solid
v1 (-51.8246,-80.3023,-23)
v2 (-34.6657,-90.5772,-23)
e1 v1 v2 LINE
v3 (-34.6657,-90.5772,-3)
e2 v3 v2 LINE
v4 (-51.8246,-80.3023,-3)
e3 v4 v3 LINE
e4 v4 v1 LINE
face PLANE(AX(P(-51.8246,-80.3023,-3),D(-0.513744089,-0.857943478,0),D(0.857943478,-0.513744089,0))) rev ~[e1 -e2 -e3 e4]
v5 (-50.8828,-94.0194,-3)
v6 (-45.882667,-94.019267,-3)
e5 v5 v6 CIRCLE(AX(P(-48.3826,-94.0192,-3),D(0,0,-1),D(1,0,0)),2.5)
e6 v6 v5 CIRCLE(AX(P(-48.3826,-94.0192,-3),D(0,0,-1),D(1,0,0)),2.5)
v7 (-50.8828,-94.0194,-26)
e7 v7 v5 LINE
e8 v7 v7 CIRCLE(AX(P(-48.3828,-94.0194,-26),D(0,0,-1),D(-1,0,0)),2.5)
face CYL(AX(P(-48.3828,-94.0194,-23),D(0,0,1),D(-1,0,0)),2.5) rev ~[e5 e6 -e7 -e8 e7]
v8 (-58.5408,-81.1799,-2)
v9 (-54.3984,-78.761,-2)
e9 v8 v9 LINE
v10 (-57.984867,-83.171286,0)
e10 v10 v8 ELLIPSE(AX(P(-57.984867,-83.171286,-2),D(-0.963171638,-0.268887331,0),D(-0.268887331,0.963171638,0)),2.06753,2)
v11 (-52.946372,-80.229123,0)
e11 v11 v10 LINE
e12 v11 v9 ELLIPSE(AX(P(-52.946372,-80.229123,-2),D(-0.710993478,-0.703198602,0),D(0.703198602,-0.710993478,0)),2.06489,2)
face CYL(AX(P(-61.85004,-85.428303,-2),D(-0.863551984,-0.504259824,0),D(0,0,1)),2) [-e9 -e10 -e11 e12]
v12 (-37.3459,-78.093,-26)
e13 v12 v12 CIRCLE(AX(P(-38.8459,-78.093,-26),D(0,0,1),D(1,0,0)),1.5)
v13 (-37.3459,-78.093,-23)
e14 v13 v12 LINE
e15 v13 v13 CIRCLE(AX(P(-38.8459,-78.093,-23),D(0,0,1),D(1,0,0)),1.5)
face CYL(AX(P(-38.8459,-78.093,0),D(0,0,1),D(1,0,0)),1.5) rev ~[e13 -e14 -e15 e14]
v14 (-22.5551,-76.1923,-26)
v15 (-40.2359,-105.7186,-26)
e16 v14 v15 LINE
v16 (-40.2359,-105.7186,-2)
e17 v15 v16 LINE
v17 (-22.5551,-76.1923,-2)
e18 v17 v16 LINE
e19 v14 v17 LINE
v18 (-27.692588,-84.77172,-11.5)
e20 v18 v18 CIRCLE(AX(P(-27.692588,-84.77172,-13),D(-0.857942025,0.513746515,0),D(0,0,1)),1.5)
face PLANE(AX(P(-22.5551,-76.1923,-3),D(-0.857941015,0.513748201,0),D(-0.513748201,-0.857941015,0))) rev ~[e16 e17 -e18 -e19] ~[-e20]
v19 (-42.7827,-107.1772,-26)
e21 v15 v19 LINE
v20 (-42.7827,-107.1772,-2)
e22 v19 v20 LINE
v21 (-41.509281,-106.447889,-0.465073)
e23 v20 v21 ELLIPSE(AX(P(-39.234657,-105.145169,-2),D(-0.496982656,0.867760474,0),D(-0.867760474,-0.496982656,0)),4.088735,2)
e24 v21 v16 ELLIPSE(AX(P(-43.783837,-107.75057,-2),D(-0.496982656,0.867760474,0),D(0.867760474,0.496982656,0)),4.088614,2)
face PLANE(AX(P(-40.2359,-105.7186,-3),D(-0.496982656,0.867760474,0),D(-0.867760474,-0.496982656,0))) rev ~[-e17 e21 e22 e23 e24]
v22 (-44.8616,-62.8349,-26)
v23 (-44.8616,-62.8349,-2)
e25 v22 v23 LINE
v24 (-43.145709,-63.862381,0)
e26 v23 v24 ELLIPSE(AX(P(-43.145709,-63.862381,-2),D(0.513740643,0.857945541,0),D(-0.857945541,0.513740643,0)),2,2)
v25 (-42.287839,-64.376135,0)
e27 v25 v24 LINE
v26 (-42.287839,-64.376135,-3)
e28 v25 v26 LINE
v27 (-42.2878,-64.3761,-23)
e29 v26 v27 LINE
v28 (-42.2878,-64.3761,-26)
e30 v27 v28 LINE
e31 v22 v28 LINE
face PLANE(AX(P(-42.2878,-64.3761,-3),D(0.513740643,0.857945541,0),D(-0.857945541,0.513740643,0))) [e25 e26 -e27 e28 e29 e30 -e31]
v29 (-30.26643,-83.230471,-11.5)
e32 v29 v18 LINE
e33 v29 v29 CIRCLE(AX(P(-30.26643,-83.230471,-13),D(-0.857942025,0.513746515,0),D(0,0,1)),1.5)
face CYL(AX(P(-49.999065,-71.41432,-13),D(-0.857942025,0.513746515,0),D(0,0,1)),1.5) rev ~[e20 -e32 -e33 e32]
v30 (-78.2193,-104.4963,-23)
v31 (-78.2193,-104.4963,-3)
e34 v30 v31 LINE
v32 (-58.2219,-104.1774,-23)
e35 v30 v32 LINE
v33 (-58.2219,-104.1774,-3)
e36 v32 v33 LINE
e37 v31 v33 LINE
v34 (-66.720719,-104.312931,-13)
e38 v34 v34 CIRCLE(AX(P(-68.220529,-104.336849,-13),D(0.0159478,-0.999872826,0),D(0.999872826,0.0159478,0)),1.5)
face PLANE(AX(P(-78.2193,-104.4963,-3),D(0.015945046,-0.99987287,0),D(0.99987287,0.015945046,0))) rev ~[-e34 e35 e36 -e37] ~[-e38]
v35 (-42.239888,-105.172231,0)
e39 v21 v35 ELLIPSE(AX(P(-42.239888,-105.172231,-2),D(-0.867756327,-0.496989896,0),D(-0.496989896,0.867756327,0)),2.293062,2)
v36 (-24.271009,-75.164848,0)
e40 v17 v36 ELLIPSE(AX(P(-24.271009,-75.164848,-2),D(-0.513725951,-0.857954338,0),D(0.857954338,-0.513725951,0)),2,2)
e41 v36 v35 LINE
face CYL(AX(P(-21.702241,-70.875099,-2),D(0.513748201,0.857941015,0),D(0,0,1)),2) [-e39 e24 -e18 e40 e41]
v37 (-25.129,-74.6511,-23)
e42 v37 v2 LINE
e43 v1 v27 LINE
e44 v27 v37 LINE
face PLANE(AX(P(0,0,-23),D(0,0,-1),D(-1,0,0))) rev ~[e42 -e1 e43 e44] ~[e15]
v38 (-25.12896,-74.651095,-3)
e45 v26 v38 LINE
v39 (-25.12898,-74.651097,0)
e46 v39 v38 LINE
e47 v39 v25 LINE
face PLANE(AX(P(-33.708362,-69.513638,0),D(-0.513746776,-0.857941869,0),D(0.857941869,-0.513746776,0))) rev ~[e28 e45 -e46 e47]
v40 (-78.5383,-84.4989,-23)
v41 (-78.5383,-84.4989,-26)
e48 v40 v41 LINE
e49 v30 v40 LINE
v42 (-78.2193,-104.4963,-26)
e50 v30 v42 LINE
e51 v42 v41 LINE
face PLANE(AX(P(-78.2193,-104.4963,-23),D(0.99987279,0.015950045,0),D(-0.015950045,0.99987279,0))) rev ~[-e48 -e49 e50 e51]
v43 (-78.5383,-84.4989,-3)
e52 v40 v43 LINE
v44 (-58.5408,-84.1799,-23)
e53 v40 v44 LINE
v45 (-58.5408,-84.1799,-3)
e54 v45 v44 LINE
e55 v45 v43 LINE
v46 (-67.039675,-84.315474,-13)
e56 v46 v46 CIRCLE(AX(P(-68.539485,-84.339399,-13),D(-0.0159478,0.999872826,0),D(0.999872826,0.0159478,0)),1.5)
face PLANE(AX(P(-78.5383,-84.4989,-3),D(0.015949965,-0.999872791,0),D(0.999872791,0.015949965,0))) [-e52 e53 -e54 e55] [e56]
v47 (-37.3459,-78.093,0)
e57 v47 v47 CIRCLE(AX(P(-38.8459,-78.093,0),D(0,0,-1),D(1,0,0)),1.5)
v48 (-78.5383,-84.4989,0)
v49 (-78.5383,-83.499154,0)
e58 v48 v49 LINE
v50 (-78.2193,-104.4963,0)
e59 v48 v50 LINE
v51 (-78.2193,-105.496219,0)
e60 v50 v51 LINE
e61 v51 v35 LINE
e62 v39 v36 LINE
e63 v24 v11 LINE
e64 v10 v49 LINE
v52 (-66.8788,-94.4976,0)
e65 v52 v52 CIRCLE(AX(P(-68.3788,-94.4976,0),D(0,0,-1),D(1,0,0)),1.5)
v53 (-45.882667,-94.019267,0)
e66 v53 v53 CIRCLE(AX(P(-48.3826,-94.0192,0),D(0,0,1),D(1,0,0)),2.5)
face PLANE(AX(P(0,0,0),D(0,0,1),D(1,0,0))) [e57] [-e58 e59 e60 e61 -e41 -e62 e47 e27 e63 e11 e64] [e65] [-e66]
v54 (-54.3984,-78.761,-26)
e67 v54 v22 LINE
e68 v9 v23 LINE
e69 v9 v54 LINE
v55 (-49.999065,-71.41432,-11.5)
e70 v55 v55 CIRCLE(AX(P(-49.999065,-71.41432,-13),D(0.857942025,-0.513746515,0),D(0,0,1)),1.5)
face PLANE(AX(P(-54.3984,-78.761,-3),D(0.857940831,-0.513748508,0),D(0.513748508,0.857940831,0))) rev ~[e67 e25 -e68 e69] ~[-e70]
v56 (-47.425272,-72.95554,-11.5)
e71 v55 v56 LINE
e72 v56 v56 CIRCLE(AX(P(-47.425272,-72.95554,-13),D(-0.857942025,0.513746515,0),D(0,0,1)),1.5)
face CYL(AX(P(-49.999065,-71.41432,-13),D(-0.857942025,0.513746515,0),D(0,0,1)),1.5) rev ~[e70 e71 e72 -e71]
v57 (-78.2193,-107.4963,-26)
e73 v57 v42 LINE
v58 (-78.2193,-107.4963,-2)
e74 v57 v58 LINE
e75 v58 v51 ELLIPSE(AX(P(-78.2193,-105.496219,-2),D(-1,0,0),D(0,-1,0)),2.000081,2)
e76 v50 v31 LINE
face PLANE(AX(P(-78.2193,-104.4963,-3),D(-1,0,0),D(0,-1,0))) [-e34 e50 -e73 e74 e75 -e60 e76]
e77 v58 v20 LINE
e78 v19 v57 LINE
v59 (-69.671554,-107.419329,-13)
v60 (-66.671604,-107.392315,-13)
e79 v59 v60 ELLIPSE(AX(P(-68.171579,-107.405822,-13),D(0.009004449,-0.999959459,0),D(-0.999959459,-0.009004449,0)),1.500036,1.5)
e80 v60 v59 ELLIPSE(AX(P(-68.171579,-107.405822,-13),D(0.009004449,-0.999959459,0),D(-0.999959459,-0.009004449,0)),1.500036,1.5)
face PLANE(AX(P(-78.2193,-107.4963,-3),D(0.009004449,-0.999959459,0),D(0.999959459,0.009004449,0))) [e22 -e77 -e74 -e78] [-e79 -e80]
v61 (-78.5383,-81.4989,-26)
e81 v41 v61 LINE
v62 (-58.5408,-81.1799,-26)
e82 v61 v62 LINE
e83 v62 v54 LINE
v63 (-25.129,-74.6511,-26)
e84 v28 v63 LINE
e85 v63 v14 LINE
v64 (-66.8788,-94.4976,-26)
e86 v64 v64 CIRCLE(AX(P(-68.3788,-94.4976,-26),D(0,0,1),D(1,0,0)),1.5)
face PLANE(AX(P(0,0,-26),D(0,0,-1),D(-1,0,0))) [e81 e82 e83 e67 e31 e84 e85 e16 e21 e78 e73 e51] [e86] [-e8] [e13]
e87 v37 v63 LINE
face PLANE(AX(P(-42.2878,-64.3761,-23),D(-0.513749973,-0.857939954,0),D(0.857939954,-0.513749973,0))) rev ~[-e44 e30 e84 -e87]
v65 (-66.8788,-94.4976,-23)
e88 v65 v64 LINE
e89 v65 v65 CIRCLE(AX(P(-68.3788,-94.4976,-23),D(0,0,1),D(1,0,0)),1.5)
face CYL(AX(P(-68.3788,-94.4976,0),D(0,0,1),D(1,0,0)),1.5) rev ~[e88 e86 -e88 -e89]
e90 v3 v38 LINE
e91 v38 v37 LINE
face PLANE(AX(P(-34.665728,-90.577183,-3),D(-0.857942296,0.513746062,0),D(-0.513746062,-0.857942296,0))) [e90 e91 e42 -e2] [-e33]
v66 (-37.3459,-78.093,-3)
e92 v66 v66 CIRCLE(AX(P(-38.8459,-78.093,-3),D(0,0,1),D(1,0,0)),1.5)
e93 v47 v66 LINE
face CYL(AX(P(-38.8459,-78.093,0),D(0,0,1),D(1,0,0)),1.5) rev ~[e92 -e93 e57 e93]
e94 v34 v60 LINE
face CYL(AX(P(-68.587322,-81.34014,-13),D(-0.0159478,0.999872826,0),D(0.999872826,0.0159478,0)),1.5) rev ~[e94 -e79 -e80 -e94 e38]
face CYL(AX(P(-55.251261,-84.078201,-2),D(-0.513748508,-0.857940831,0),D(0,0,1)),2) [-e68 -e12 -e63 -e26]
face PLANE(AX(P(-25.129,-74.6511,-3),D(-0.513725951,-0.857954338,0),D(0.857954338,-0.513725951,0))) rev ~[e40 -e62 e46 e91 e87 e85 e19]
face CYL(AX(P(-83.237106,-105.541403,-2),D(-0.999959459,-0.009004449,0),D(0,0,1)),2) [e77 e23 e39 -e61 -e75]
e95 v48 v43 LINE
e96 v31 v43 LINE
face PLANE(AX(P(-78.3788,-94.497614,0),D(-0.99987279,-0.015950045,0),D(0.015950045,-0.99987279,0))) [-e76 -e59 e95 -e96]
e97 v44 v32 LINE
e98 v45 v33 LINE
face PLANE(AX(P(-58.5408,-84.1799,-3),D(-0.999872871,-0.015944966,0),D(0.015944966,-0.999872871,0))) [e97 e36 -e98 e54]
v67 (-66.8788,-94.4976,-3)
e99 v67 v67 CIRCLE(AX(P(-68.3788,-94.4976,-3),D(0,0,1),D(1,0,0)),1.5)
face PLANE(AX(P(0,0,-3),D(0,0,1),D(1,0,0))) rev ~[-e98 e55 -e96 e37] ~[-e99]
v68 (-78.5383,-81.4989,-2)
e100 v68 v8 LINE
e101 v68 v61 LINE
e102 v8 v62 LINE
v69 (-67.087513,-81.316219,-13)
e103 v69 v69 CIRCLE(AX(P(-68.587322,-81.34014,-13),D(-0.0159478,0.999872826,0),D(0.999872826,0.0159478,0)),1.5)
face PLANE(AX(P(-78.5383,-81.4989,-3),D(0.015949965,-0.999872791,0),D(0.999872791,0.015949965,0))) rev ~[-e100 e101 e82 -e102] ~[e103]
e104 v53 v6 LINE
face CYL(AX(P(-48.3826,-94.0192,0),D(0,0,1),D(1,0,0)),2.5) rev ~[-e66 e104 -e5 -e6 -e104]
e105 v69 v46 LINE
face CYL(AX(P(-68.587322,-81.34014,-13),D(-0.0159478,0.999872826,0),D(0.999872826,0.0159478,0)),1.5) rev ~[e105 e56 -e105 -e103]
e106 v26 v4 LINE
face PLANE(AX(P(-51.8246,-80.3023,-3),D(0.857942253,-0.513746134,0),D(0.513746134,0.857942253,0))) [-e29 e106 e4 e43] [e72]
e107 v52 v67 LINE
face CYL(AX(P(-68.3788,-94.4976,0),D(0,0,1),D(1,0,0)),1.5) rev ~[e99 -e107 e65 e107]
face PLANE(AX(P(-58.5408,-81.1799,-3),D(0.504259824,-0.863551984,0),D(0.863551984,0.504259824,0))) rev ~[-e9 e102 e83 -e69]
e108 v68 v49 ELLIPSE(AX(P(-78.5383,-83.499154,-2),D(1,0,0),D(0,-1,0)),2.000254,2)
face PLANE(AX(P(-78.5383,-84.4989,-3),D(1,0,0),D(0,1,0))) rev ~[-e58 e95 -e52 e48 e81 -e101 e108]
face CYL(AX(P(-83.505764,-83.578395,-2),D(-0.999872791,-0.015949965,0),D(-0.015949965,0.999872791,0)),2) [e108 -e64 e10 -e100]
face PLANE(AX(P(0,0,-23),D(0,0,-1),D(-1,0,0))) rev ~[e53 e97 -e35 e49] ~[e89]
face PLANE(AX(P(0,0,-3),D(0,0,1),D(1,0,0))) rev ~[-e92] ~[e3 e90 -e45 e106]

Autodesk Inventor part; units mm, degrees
ref_plane "YZ Plane" through (0, 0, 0) normal (1, 0, 0) x (0, 1, 0)
ref_plane "XZ Plane" through (0, 0, 0) normal (0, 1, 0) x (-1, 0, 0)
ref_plane "XY Plane" through (0, 0, 0) normal (0, 0, 1) x (1, 0, 0)
sketch "Sketch1" plane through (0, 0, 0) normal (0, 0, 1) x (1, 0, 0)
  circle A0 centre (-48.3826, -94.0192) radius 2.5
  circle A1 centre (2.8152, 8.6005) radius 2.5
  line L0 (-48.3826, -94.0192) -> (40.5013, 54.4144)
  line L1 (2.8152, 8.6005) -> (32.8522, -42.034)
  line L2 (-2.0828, 38.9998) -> (-2.0828, -39)
  line L3 (-2.0828, -0.0001) -> (69.8745, -0.0001)
  line L4 (7.9172, -0.0001) -> (-0.6834, -5.1021)
  line L5 (2.8152, 8.6005) -> (7.9172, -0.0001)
  line L6 (7.9172, -0.0001) -> (16.5177, 5.1019)
  line L7 (7.9172, -0.0001) -> (-0.6834, -5.1021)
  line L8 (-0.6834, -5.1021) -> (-0.6834, -5.1021)
  line L9 (7.9172, -0.0001) -> (16.5177, 5.1019)
  line L10 (16.5177, 5.1019) -> (16.5177, 5.1019)
  line L11 (7.9172, -0.0001) -> (-0.6622, 5.1374)
  line L12 (7.9172, -0.0001) -> (16.4966, -5.1375)
  line L13 (-48.3826, -94.0192) -> (-43.2452, -85.4397)
  line L14 (-54.6233, -56.9895) -> (-9.7188, -83.8789)
  line L15 (-43.2452, -85.4397) -> (-34.6657, -90.5772)
  line L16 (-43.2452, -85.4397) -> (-51.8246, -80.3023)
  line L17 (-34.6657, -90.5772) -> (16.4966, -5.1375)
  line L18 (-0.6622, 5.1374) -> (-51.8246, -80.3023)
  line L19 (-3.7386, 0) -> (13.452, 10.2217)
  line L20 (-3.7386, 0) -> (13.4203, -10.2749)
  circle A2 centre (6.9172, -34) radius 2.5
  circle A3 centre (6.9172, -34) radius 5
  circle A4 centre (6.9172, 34) radius 2.5
  circle A5 centre (6.9172, 34) radius 4.9998
  line L21 (15.8878, 38.9998) -> (-2.0828, 38.9998)
  line L22 (-2.0828, -39) -> (15.933, -39)
  line L23 (-13.3434, -16.0398) -> (19.6624, -35.8041)
  line L24 (-13.3434, 16.0396) -> (19.6624, 35.8039)
  line L25 (-13.3434, -16.0398) -> (-15.9172, -14.4985)
  line L26 (-2.0828, -0.0001) -> (-26.2435, -0.0001)
  line L27 (-15.9172, -14.4985) -> (-7.2354, -0.0001)
  line L28 (-13.3434, 16.0396) -> (-15.9172, 14.4984)
  line L29 (-15.9172, 14.4984) -> (-7.2354, -0.0001)
  line L30 (13.4203, -10.2749) -> (15.9172, -11.7701)
  line L31 (15.933, -39) -> (15.8878, 38.9998)
  line L32 (13.452, 10.2217) -> (15.9037, 11.6795)
  line L33 (15.9037, 11.6795) -> (6.3124, 27.8097)
  line L34 (15.9172, -11.7701) -> (6.3124, -27.8099)
  line L35 (15.9037, 11.6795) -> (15.9172, -11.7701)
  line L36 (-15.9172, -14.4985) -> (-15.9172, 14.4984)
  line L37 (6.3124, 27.8097) -> (-15.9172, 14.4984) projected
  circle A6 centre (-48.3826, -94.0192) radius 2.5
  line L38 (-311.4249, 0) -> (127.5863, 0)
  line L39 (-170.3704, -117.2696) -> (-13.4682, 154.4931)
  line L40 (-102.6648, 0) -> (-157.9558, -95.7668)
  line L41 (-157.9558, -95.7668) -> (-48.3826, -94.0192)
  line L42 (-48.3826, -94.0192) -> (-58.3814, -94.1786)
  line L43 (-58.3814, -94.1786) -> (-58.5408, -84.1799)
  line L44 (-58.5408, -84.1799) -> (-58.2219, -104.1774)
  line L45 (-51.8246, -80.3023) -> (-41.5497, -63.1434)
  line L46 (-41.5497, -63.1434) -> (-24.3908, -73.4184)
  line L47 (-58.5408, -84.1799) -> (-78.5383, -84.4989)
  line L48 (-78.5383, -84.4989) -> (-78.2193, -104.4963)
  line L49 (-78.2193, -104.4963) -> (-58.2219, -104.1774)
  line L50 (-58.5408, -84.1799) -> (-51.8246, -80.3023)
  line L51 (-58.2219, -104.1774) -> (-26.2433, -104.1774)
  line L52 (-34.6657, -90.5772) -> (-48.6317, -113.8999)
  circle A7 centre (-48.3828, -94.0194) radius 2.5 projected
  point P0 (0, 0)
  point P1 (6.9172, -21)
  point P2 (-3.7386, 0)
  point P3 (-42.2878, -64.3761)
  point P4 (-42.8097, -104.1774)
  point P5 (-25.129, -74.6511)
  dimension "d0" = 10
  dimension "d1" = 10
  dimension "d2" = 10
  dimension "d3" = 10
  dimension "d4" = 10
  dimension "d5" = 10
  dimension "d6" = 10
  dimension "d7" = 10
  dimension "d8" = 10
  dimension "d9" = 10
  dimension "d10" = 10
  dimension "d11" = 20
  dimension "d12" = 20
  dimension "d13" = 3
  dimension "d14" = 3
  dimension "d20" = 110.582
  dimension "d21" = 10
  dimension "d22" = 10
  dimension "d23" = 20
  dimension "d24" = 20
  dimension "d25" = 20
  dimension "d26" = 121.827
  dimension "d27" = 146.9972
extrude "Extrusion1" add sketch "Sketch1" against normal blind 3 contours A0 L0 L15 L52 L51 L44 L41 | A0 L41 L43 L50 L16 L0 | L16 L18 L14 L0 | L0 L14 L17 L15 | L44 L49 L48 L41 | L41 L48 L47 L43
sketch "Sketch2" plane through (0, 0, -3) normal (0, 0, -1) x (-1, 0, 0)
  line L0 (51.8246, -80.3023) -> (42.2878, -64.3761) projected
  line L1 (25.129, -74.6511) -> (42.8097, -104.1774) projected
  line L2 (78.5383, -84.4989) -> (58.5408, -84.1799)
  line L3 (58.5408, -84.1799) -> (51.8246, -80.3023)
  line L4 (42.2878, -64.3761) -> (25.129, -74.6511)
  line L5 (78.5383, -84.4989) -> (78.2193, -104.4963)
  line L6 (58.5408, -84.1799) -> (58.5408, -81.1799)
  line L7 (51.8246, -80.3023) -> (54.3984, -78.761)
  line L8 (42.8097, -104.1774) -> (40.2359, -105.7186)
  line L9 (42.8097, -104.1774) -> (42.7827, -107.1772)
  line L10 (78.5383, -84.4989) -> (78.5383, -81.4989)
  line L11 (78.2193, -104.4963) -> (78.2193, -107.4963)
  line L12 (42.2878, -64.3761) -> (44.8616, -62.8349)
  line L13 (42.2878, -64.3761) -> (25.129, -74.6511) projected
  line L14 (25.129, -74.6511) -> (22.5551, -76.1923)
  line L15 (78.5383, -81.4989) -> (58.5408, -81.1799)
  line L16 (58.5408, -81.1799) -> (54.3984, -78.761)
  line L17 (54.3984, -78.761) -> (44.8616, -62.8349)
  line L18 (22.5551, -76.1923) -> (40.2359, -105.7186)
  line L19 (40.2359, -105.7186) -> (42.7827, -107.1772)
  line L20 (78.2193, -107.4963) -> (42.7827, -107.1772)
  line L21 (58.5408, -84.1799) -> (58.2219, -104.1774)
  line L22 (51.8246, -80.3023) -> (34.6657, -90.5772)
  circle A0 centre (48.3826, -94.0192) radius 2.5 projected
  circle A1 centre (48.3826, -94.0192) radius 2.5
  line L23 (78.2193, -104.4963) -> (42.8097, -104.1774)
  line L24 (58.2219, -104.1774) -> (42.8097, -104.1774) projected
  line L25 (78.2193, -104.4963) -> (58.2219, -104.1774) projected
  point P0 (0, 0)
  dimension "d30" = 3
  dimension "d31" = 3
  dimension "d32" = 3
  dimension "d33" = 3
  dimension "d34" = 3
  dimension "d35" = 3
  dimension "d36" = 3
  dimension "d37" = 3
extrude "Extrusion2" add sketch "Sketch2" along normal blind 20 and the other way blind 3 contours L7 L16 L6 L3 | L0 L12 L17 L7 | L6 L15 L10 L2 | L1 L8 L18 L14 | L25 L23 L24 | L9 L19 L8 | L23 L11 L20 L9
sketch "Sketch3" plane through (0, 0, -3) normal (0, 0, -1) x (-1, 0, 0)
  line L0 (58.5408, -84.1799) -> (51.8246, -80.3023) projected
  line L1 (51.8246, -80.3023) -> (34.6657, -90.5772)
  line L2 (25.129, -74.6511) -> (42.8097, -104.1774) projected
  line L3 (42.8097, -104.1774) -> (58.2219, -104.1774) projected
  line L4 (58.5408, -84.1799) -> (58.2219, -104.1774)
  line L5 (78.2193, -104.4963) -> (42.8097, -104.1774) projected
  line L6 (42.8097, -104.1774) -> (25.129, -74.6511) projected
  circle A0 centre (48.3828, -94.0194) radius 2.5 projected
  point P0 (0, 0)
  dimension "d42" = 119.086
extrude "Extrusion3" add sketch "Sketch3" along normal blind 20
sketch "Sketch4" plane through (0, 0, -23) normal (0, 0, -1) x (-1, 0, 0)
  point P0 (0, 0)
sketch "Sketch5" plane through (0, 0, -23) normal (0, 0, -1) x (-1, 0, 0)
  circle A0 centre (48.3828, -94.0194) radius 2.5 projected
  line L0 (44.8616, -62.8349) -> (42.2878, -64.3761) projected
  line L1 (42.2878, -64.3761) -> (51.8246, -80.3023) projected
  line L2 (51.8246, -80.3023) -> (34.6657, -90.5772) projected
  line L3 (34.6657, -90.5772) -> (25.129, -74.6511) projected
  line L4 (25.129, -74.6511) -> (22.5551, -76.1923) projected
  line L5 (22.5551, -76.1923) -> (40.2359, -105.7186) projected
  line L6 (40.2359, -105.7186) -> (42.7827, -107.1772) projected
  line L7 (42.7827, -107.1772) -> (78.2193, -107.4963) projected
  line L8 (78.2193, -107.4963) -> (78.2193, -104.4963) projected
  line L9 (78.2193, -104.4963) -> (58.2219, -104.1774) projected
  line L10 (58.2219, -104.1774) -> (58.5408, -84.1799) projected
  line L11 (58.5408, -84.1799) -> (78.5383, -84.4989) projected
  line L12 (78.5383, -84.4989) -> (78.5383, -81.4989) projected
  line L13 (78.5383, -81.4989) -> (58.5408, -81.1799) projected
  line L14 (58.5408, -81.1799) -> (54.3984, -78.761) projected
  line L15 (54.3984, -78.761) -> (44.8616, -62.8349) projected
  line L16 (58.5408, -84.1799) -> (58.2219, -104.1774) projected
  line L17 (58.2219, -104.1774) -> (78.2193, -104.4963) projected
  line L18 (78.2193, -104.4963) -> (78.5383, -84.4989) projected
  line L19 (78.5383, -84.4989) -> (58.5408, -84.1799) projected
  line L20 (34.6657, -90.5772) -> (51.8246, -80.3023) projected
  line L21 (51.8246, -80.3023) -> (42.2878, -64.3761) projected
  line L22 (42.2878, -64.3761) -> (25.129, -74.6511) projected
  line L23 (25.129, -74.6511) -> (34.6657, -90.5772) projected
  point P0 (0, 0)
extrude "Extrusion4" add sketch "Sketch5" along normal blind 3
sketch "Sketch6" plane through (0, 0, 0) normal (0, 0, 1) x (1, 0, 0)
  line L0 (-42.2878, -64.3761) -> (-25.129, -74.6511) projected
  line L1 (-33.7084, -69.5136) -> (-49.5228, -95.9232)
  line L2 (-33.7084, -69.5136) -> (-38.8459, -78.093)
  circle A0 centre (-38.8459, -78.093) radius 1.5
  line L3 (-78.5383, -84.4989) -> (-78.2193, -104.4963) projected
  line L4 (-78.3788, -94.4976) -> (-68.3788, -94.4976)
  circle A1 centre (-68.3788, -94.4976) radius 1.5
  point P0 (0, 0)
  dimension "d47" = 10
  dimension "d48" = 3
  dimension "d56" = 10
  dimension "d57" = 3
extrude "Extrusion5" cut sketch "Sketch6" against normal through all
sketch "Sketch7" plane through (-44.8616, -62.8349, -26) normal (-0.857942, 0.5137465, 0) x (0, 0, 1)
  line L0 (0, 0) -> (26, 0) projected
  line L1 (26, 0) -> (13, 0)
  line L2 (13, 0) -> (13, -10)
  line L3 (13, -10) -> (26, -10)
  line L4 (26, -10) -> (26, 0)
  circle A0 centre (13, -10) radius 1.5
  point P0 (26, 76.9562)
  dimension "d51" = 13
  dimension "d52" = 10
  dimension "d53" = 3
extrude "Extrusion6" cut sketch "Sketch7" against normal through all contours A0 L3 L2 | L2 L3 A0
sketch "Sketch8" plane through (-58.5408, -81.1799, 0) normal (-0.0159478, 0.9998728, 0) x (0.9998728, 0.0159478, 0)
  line L0 (-20.0478, 3) -> (-20.0478, 23) projected
  line L1 (-20.0478, 13) -> (-10.0478, 13)
  circle A0 centre (-10.0478, 13) radius 1.5
  point P0 (59.828, 0)
  dimension "d58" = 10
  dimension "d59" = 3
extrude "Extrusion7" cut sketch "Sketch8" against normal through all
fillet "Fillet1" radius 2 5 edges at (-60.501, -107.3368, 0) (-31.3955, -90.9554, 0) (-49.63, -70.798, 0) (-68.5396, -81.3394, 0) (-56.4696, -79.9705, 0)
properties part number "2020_nodes_conn" material "PET Plastic"
